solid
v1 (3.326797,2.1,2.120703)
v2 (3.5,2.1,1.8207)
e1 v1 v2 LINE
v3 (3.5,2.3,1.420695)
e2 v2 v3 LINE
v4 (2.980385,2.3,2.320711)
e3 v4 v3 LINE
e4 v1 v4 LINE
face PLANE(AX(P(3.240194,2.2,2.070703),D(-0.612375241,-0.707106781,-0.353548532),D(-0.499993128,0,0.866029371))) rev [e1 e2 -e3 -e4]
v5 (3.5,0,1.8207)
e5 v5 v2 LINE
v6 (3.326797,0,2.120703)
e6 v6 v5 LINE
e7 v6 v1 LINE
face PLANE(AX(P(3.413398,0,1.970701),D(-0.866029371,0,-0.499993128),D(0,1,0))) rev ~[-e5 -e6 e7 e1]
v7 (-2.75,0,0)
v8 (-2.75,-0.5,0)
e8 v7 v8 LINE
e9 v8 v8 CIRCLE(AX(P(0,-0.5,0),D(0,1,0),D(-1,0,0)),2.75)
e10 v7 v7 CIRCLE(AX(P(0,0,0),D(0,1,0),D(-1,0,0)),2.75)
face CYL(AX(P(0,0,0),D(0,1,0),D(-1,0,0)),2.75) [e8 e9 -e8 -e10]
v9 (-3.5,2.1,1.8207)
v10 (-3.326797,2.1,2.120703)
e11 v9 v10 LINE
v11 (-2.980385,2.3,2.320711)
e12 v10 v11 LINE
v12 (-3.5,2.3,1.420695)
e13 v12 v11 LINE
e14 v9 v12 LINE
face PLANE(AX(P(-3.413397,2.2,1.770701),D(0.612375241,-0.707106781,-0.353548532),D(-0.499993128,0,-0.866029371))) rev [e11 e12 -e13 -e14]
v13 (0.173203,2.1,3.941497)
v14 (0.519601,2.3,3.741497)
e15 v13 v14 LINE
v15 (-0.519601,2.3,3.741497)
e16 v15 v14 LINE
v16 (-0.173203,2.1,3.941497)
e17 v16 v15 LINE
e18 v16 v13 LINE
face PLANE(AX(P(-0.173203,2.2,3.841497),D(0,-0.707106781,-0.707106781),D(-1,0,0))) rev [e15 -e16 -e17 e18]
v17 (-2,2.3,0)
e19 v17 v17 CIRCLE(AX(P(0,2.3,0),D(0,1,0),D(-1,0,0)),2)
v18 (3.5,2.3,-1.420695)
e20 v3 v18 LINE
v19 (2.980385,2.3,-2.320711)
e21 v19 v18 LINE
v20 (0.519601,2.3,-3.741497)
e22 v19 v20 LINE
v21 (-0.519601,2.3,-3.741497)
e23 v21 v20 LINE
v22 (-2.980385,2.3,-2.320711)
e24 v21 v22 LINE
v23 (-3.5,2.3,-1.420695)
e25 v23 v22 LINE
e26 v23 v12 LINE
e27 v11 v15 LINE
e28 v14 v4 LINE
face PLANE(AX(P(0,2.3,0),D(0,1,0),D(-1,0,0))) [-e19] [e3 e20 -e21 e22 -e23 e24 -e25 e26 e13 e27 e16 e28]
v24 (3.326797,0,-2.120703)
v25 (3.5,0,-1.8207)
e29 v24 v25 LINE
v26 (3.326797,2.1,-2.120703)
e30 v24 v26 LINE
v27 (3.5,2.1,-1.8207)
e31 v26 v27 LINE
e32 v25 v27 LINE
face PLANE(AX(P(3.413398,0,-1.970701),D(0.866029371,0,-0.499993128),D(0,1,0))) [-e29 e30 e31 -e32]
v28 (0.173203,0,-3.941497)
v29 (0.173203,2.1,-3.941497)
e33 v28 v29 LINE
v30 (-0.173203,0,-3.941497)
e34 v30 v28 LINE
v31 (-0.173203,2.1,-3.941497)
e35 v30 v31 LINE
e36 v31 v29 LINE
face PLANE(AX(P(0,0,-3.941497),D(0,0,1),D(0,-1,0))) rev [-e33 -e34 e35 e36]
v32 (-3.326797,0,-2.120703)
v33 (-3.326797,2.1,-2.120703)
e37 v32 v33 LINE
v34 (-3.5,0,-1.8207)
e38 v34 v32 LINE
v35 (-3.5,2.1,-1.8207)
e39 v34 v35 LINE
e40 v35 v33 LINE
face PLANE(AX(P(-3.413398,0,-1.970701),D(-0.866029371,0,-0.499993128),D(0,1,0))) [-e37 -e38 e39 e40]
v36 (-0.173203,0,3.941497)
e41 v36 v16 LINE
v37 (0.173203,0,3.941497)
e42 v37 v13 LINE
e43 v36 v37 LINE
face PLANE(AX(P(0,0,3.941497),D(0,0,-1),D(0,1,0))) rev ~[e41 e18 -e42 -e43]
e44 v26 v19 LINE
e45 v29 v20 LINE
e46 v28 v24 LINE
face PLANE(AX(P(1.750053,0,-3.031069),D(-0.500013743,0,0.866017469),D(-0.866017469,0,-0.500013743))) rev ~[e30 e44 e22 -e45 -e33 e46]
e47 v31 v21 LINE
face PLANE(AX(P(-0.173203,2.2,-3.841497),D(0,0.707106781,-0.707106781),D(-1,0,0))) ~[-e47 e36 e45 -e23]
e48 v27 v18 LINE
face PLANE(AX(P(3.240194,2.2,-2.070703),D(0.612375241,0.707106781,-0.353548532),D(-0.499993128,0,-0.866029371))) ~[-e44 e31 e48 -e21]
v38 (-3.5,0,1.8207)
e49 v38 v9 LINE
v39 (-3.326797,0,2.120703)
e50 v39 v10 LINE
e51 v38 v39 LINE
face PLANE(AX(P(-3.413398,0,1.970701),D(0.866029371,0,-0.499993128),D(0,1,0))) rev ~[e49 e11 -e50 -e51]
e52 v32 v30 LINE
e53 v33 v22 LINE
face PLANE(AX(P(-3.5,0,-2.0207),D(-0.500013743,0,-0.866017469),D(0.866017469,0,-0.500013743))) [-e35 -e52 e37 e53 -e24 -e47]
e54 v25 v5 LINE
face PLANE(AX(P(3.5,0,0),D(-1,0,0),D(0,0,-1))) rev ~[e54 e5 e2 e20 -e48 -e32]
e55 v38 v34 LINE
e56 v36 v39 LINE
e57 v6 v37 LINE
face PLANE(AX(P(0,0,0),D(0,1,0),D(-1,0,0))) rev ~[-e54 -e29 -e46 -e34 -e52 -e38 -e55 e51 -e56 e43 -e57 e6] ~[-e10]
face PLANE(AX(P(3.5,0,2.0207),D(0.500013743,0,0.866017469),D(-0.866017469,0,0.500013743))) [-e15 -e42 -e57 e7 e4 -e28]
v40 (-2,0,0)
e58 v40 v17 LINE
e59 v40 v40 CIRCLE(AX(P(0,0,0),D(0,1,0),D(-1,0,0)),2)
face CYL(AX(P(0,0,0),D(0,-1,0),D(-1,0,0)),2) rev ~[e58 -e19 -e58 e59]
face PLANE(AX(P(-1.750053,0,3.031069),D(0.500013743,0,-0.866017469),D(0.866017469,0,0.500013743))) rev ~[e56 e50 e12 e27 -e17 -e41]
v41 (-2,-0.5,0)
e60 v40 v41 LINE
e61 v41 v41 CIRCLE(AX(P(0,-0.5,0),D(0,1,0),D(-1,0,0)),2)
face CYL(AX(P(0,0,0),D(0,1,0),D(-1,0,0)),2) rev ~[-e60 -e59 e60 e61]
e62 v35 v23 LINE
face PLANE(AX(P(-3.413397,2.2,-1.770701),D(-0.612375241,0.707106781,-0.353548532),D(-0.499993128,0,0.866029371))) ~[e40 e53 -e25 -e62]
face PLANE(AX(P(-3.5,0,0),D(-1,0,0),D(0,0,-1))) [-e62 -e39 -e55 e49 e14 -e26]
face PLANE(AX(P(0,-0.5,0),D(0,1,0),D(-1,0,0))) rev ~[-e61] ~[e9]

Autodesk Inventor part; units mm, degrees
ref_plane "YZ Plane" through (0, 0, 0) normal (1, 0, 0) x (0, 1, 0)
ref_plane "XZ Plane" through (0, 0, 0) normal (0, 1, 0) x (-1, 0, 0)
ref_plane "XY Plane" through (0, 0, 0) normal (0, 0, 1) x (1, 0, 0)
sketch "スケッチ2" plane through (0, 0, 0) normal (0, 1, 0) x (-1, 0, 0)
  circle A0 centre (0, 0) radius 2
  circle A1 centre (0, 0) radius 2.75
  circle A2 centre (0, 0) radius 3.5
  line L0 (3.2709, 0) -> (-4.3069, 0) construction
  line L1 (-3.5, -2.0207) -> (0, -4.0415)
  line L2 (-3.5, 0) -> (-3.5, -2.0207)
  line L3 (0, 3.4516) -> (0, -4.8702) construction
  line L4 (-3.5, 2.0207) -> (0, 4.0415)
  line L5 (-3.5, 0) -> (-3.5, 2.0207)
  line L6 (3.5, -2.0207) -> (0, -4.0415)
  line L7 (3.5, 0) -> (3.5, -2.0207)
  line L8 (3.5, 2.0207) -> (0, 4.0415)
  line L9 (3.5, 0) -> (3.5, 2.0207)
  dimension "d8" = 7
  dimension "d6" = 4
  dimension "d7" = 5.5
  dimension "d25" = 120
extrude "押し出し1" add sketch "スケッチ2" against normal blind 0.5 contours A1
extrude "押し出し2" add sketch "スケッチ2" along normal blind 2.3 contours A1 | A2 | L7 L6 A2 | A2 L8 L9 | A2 L4 L8 | L6 L1 A2 | A2 L5 L4 | L1 L2 A2
chamfer "面取り1" distance 0.2 angle 45 6 edges at (3.5, 1.15, -2.0207) (0, 1.15, -4.0415) (-3.5, 1.15, -2.0207) (-3.5, 1.15, 2.0207) (0, 1.15, 4.0415) (3.5, 1.15, 2.0207)
chamfer "面取り2" distance 0.2 angle 45 6 edges at (3.4134, 2.3, -1.9707) (0, 2.3, -3.9415) (-3.4134, 2.3, -1.9707) (-3.4134, 2.3, 1.9707) (0, 2.3, 3.9415) (3.4134, 2.3, 1.9707)
thread "ねじ1" size "M4x0.7" class "6H" standard "ANSI Metric M Profile" full length
properties part number "S4-05-3W" material "ステンレス鋼 AISI 304"
